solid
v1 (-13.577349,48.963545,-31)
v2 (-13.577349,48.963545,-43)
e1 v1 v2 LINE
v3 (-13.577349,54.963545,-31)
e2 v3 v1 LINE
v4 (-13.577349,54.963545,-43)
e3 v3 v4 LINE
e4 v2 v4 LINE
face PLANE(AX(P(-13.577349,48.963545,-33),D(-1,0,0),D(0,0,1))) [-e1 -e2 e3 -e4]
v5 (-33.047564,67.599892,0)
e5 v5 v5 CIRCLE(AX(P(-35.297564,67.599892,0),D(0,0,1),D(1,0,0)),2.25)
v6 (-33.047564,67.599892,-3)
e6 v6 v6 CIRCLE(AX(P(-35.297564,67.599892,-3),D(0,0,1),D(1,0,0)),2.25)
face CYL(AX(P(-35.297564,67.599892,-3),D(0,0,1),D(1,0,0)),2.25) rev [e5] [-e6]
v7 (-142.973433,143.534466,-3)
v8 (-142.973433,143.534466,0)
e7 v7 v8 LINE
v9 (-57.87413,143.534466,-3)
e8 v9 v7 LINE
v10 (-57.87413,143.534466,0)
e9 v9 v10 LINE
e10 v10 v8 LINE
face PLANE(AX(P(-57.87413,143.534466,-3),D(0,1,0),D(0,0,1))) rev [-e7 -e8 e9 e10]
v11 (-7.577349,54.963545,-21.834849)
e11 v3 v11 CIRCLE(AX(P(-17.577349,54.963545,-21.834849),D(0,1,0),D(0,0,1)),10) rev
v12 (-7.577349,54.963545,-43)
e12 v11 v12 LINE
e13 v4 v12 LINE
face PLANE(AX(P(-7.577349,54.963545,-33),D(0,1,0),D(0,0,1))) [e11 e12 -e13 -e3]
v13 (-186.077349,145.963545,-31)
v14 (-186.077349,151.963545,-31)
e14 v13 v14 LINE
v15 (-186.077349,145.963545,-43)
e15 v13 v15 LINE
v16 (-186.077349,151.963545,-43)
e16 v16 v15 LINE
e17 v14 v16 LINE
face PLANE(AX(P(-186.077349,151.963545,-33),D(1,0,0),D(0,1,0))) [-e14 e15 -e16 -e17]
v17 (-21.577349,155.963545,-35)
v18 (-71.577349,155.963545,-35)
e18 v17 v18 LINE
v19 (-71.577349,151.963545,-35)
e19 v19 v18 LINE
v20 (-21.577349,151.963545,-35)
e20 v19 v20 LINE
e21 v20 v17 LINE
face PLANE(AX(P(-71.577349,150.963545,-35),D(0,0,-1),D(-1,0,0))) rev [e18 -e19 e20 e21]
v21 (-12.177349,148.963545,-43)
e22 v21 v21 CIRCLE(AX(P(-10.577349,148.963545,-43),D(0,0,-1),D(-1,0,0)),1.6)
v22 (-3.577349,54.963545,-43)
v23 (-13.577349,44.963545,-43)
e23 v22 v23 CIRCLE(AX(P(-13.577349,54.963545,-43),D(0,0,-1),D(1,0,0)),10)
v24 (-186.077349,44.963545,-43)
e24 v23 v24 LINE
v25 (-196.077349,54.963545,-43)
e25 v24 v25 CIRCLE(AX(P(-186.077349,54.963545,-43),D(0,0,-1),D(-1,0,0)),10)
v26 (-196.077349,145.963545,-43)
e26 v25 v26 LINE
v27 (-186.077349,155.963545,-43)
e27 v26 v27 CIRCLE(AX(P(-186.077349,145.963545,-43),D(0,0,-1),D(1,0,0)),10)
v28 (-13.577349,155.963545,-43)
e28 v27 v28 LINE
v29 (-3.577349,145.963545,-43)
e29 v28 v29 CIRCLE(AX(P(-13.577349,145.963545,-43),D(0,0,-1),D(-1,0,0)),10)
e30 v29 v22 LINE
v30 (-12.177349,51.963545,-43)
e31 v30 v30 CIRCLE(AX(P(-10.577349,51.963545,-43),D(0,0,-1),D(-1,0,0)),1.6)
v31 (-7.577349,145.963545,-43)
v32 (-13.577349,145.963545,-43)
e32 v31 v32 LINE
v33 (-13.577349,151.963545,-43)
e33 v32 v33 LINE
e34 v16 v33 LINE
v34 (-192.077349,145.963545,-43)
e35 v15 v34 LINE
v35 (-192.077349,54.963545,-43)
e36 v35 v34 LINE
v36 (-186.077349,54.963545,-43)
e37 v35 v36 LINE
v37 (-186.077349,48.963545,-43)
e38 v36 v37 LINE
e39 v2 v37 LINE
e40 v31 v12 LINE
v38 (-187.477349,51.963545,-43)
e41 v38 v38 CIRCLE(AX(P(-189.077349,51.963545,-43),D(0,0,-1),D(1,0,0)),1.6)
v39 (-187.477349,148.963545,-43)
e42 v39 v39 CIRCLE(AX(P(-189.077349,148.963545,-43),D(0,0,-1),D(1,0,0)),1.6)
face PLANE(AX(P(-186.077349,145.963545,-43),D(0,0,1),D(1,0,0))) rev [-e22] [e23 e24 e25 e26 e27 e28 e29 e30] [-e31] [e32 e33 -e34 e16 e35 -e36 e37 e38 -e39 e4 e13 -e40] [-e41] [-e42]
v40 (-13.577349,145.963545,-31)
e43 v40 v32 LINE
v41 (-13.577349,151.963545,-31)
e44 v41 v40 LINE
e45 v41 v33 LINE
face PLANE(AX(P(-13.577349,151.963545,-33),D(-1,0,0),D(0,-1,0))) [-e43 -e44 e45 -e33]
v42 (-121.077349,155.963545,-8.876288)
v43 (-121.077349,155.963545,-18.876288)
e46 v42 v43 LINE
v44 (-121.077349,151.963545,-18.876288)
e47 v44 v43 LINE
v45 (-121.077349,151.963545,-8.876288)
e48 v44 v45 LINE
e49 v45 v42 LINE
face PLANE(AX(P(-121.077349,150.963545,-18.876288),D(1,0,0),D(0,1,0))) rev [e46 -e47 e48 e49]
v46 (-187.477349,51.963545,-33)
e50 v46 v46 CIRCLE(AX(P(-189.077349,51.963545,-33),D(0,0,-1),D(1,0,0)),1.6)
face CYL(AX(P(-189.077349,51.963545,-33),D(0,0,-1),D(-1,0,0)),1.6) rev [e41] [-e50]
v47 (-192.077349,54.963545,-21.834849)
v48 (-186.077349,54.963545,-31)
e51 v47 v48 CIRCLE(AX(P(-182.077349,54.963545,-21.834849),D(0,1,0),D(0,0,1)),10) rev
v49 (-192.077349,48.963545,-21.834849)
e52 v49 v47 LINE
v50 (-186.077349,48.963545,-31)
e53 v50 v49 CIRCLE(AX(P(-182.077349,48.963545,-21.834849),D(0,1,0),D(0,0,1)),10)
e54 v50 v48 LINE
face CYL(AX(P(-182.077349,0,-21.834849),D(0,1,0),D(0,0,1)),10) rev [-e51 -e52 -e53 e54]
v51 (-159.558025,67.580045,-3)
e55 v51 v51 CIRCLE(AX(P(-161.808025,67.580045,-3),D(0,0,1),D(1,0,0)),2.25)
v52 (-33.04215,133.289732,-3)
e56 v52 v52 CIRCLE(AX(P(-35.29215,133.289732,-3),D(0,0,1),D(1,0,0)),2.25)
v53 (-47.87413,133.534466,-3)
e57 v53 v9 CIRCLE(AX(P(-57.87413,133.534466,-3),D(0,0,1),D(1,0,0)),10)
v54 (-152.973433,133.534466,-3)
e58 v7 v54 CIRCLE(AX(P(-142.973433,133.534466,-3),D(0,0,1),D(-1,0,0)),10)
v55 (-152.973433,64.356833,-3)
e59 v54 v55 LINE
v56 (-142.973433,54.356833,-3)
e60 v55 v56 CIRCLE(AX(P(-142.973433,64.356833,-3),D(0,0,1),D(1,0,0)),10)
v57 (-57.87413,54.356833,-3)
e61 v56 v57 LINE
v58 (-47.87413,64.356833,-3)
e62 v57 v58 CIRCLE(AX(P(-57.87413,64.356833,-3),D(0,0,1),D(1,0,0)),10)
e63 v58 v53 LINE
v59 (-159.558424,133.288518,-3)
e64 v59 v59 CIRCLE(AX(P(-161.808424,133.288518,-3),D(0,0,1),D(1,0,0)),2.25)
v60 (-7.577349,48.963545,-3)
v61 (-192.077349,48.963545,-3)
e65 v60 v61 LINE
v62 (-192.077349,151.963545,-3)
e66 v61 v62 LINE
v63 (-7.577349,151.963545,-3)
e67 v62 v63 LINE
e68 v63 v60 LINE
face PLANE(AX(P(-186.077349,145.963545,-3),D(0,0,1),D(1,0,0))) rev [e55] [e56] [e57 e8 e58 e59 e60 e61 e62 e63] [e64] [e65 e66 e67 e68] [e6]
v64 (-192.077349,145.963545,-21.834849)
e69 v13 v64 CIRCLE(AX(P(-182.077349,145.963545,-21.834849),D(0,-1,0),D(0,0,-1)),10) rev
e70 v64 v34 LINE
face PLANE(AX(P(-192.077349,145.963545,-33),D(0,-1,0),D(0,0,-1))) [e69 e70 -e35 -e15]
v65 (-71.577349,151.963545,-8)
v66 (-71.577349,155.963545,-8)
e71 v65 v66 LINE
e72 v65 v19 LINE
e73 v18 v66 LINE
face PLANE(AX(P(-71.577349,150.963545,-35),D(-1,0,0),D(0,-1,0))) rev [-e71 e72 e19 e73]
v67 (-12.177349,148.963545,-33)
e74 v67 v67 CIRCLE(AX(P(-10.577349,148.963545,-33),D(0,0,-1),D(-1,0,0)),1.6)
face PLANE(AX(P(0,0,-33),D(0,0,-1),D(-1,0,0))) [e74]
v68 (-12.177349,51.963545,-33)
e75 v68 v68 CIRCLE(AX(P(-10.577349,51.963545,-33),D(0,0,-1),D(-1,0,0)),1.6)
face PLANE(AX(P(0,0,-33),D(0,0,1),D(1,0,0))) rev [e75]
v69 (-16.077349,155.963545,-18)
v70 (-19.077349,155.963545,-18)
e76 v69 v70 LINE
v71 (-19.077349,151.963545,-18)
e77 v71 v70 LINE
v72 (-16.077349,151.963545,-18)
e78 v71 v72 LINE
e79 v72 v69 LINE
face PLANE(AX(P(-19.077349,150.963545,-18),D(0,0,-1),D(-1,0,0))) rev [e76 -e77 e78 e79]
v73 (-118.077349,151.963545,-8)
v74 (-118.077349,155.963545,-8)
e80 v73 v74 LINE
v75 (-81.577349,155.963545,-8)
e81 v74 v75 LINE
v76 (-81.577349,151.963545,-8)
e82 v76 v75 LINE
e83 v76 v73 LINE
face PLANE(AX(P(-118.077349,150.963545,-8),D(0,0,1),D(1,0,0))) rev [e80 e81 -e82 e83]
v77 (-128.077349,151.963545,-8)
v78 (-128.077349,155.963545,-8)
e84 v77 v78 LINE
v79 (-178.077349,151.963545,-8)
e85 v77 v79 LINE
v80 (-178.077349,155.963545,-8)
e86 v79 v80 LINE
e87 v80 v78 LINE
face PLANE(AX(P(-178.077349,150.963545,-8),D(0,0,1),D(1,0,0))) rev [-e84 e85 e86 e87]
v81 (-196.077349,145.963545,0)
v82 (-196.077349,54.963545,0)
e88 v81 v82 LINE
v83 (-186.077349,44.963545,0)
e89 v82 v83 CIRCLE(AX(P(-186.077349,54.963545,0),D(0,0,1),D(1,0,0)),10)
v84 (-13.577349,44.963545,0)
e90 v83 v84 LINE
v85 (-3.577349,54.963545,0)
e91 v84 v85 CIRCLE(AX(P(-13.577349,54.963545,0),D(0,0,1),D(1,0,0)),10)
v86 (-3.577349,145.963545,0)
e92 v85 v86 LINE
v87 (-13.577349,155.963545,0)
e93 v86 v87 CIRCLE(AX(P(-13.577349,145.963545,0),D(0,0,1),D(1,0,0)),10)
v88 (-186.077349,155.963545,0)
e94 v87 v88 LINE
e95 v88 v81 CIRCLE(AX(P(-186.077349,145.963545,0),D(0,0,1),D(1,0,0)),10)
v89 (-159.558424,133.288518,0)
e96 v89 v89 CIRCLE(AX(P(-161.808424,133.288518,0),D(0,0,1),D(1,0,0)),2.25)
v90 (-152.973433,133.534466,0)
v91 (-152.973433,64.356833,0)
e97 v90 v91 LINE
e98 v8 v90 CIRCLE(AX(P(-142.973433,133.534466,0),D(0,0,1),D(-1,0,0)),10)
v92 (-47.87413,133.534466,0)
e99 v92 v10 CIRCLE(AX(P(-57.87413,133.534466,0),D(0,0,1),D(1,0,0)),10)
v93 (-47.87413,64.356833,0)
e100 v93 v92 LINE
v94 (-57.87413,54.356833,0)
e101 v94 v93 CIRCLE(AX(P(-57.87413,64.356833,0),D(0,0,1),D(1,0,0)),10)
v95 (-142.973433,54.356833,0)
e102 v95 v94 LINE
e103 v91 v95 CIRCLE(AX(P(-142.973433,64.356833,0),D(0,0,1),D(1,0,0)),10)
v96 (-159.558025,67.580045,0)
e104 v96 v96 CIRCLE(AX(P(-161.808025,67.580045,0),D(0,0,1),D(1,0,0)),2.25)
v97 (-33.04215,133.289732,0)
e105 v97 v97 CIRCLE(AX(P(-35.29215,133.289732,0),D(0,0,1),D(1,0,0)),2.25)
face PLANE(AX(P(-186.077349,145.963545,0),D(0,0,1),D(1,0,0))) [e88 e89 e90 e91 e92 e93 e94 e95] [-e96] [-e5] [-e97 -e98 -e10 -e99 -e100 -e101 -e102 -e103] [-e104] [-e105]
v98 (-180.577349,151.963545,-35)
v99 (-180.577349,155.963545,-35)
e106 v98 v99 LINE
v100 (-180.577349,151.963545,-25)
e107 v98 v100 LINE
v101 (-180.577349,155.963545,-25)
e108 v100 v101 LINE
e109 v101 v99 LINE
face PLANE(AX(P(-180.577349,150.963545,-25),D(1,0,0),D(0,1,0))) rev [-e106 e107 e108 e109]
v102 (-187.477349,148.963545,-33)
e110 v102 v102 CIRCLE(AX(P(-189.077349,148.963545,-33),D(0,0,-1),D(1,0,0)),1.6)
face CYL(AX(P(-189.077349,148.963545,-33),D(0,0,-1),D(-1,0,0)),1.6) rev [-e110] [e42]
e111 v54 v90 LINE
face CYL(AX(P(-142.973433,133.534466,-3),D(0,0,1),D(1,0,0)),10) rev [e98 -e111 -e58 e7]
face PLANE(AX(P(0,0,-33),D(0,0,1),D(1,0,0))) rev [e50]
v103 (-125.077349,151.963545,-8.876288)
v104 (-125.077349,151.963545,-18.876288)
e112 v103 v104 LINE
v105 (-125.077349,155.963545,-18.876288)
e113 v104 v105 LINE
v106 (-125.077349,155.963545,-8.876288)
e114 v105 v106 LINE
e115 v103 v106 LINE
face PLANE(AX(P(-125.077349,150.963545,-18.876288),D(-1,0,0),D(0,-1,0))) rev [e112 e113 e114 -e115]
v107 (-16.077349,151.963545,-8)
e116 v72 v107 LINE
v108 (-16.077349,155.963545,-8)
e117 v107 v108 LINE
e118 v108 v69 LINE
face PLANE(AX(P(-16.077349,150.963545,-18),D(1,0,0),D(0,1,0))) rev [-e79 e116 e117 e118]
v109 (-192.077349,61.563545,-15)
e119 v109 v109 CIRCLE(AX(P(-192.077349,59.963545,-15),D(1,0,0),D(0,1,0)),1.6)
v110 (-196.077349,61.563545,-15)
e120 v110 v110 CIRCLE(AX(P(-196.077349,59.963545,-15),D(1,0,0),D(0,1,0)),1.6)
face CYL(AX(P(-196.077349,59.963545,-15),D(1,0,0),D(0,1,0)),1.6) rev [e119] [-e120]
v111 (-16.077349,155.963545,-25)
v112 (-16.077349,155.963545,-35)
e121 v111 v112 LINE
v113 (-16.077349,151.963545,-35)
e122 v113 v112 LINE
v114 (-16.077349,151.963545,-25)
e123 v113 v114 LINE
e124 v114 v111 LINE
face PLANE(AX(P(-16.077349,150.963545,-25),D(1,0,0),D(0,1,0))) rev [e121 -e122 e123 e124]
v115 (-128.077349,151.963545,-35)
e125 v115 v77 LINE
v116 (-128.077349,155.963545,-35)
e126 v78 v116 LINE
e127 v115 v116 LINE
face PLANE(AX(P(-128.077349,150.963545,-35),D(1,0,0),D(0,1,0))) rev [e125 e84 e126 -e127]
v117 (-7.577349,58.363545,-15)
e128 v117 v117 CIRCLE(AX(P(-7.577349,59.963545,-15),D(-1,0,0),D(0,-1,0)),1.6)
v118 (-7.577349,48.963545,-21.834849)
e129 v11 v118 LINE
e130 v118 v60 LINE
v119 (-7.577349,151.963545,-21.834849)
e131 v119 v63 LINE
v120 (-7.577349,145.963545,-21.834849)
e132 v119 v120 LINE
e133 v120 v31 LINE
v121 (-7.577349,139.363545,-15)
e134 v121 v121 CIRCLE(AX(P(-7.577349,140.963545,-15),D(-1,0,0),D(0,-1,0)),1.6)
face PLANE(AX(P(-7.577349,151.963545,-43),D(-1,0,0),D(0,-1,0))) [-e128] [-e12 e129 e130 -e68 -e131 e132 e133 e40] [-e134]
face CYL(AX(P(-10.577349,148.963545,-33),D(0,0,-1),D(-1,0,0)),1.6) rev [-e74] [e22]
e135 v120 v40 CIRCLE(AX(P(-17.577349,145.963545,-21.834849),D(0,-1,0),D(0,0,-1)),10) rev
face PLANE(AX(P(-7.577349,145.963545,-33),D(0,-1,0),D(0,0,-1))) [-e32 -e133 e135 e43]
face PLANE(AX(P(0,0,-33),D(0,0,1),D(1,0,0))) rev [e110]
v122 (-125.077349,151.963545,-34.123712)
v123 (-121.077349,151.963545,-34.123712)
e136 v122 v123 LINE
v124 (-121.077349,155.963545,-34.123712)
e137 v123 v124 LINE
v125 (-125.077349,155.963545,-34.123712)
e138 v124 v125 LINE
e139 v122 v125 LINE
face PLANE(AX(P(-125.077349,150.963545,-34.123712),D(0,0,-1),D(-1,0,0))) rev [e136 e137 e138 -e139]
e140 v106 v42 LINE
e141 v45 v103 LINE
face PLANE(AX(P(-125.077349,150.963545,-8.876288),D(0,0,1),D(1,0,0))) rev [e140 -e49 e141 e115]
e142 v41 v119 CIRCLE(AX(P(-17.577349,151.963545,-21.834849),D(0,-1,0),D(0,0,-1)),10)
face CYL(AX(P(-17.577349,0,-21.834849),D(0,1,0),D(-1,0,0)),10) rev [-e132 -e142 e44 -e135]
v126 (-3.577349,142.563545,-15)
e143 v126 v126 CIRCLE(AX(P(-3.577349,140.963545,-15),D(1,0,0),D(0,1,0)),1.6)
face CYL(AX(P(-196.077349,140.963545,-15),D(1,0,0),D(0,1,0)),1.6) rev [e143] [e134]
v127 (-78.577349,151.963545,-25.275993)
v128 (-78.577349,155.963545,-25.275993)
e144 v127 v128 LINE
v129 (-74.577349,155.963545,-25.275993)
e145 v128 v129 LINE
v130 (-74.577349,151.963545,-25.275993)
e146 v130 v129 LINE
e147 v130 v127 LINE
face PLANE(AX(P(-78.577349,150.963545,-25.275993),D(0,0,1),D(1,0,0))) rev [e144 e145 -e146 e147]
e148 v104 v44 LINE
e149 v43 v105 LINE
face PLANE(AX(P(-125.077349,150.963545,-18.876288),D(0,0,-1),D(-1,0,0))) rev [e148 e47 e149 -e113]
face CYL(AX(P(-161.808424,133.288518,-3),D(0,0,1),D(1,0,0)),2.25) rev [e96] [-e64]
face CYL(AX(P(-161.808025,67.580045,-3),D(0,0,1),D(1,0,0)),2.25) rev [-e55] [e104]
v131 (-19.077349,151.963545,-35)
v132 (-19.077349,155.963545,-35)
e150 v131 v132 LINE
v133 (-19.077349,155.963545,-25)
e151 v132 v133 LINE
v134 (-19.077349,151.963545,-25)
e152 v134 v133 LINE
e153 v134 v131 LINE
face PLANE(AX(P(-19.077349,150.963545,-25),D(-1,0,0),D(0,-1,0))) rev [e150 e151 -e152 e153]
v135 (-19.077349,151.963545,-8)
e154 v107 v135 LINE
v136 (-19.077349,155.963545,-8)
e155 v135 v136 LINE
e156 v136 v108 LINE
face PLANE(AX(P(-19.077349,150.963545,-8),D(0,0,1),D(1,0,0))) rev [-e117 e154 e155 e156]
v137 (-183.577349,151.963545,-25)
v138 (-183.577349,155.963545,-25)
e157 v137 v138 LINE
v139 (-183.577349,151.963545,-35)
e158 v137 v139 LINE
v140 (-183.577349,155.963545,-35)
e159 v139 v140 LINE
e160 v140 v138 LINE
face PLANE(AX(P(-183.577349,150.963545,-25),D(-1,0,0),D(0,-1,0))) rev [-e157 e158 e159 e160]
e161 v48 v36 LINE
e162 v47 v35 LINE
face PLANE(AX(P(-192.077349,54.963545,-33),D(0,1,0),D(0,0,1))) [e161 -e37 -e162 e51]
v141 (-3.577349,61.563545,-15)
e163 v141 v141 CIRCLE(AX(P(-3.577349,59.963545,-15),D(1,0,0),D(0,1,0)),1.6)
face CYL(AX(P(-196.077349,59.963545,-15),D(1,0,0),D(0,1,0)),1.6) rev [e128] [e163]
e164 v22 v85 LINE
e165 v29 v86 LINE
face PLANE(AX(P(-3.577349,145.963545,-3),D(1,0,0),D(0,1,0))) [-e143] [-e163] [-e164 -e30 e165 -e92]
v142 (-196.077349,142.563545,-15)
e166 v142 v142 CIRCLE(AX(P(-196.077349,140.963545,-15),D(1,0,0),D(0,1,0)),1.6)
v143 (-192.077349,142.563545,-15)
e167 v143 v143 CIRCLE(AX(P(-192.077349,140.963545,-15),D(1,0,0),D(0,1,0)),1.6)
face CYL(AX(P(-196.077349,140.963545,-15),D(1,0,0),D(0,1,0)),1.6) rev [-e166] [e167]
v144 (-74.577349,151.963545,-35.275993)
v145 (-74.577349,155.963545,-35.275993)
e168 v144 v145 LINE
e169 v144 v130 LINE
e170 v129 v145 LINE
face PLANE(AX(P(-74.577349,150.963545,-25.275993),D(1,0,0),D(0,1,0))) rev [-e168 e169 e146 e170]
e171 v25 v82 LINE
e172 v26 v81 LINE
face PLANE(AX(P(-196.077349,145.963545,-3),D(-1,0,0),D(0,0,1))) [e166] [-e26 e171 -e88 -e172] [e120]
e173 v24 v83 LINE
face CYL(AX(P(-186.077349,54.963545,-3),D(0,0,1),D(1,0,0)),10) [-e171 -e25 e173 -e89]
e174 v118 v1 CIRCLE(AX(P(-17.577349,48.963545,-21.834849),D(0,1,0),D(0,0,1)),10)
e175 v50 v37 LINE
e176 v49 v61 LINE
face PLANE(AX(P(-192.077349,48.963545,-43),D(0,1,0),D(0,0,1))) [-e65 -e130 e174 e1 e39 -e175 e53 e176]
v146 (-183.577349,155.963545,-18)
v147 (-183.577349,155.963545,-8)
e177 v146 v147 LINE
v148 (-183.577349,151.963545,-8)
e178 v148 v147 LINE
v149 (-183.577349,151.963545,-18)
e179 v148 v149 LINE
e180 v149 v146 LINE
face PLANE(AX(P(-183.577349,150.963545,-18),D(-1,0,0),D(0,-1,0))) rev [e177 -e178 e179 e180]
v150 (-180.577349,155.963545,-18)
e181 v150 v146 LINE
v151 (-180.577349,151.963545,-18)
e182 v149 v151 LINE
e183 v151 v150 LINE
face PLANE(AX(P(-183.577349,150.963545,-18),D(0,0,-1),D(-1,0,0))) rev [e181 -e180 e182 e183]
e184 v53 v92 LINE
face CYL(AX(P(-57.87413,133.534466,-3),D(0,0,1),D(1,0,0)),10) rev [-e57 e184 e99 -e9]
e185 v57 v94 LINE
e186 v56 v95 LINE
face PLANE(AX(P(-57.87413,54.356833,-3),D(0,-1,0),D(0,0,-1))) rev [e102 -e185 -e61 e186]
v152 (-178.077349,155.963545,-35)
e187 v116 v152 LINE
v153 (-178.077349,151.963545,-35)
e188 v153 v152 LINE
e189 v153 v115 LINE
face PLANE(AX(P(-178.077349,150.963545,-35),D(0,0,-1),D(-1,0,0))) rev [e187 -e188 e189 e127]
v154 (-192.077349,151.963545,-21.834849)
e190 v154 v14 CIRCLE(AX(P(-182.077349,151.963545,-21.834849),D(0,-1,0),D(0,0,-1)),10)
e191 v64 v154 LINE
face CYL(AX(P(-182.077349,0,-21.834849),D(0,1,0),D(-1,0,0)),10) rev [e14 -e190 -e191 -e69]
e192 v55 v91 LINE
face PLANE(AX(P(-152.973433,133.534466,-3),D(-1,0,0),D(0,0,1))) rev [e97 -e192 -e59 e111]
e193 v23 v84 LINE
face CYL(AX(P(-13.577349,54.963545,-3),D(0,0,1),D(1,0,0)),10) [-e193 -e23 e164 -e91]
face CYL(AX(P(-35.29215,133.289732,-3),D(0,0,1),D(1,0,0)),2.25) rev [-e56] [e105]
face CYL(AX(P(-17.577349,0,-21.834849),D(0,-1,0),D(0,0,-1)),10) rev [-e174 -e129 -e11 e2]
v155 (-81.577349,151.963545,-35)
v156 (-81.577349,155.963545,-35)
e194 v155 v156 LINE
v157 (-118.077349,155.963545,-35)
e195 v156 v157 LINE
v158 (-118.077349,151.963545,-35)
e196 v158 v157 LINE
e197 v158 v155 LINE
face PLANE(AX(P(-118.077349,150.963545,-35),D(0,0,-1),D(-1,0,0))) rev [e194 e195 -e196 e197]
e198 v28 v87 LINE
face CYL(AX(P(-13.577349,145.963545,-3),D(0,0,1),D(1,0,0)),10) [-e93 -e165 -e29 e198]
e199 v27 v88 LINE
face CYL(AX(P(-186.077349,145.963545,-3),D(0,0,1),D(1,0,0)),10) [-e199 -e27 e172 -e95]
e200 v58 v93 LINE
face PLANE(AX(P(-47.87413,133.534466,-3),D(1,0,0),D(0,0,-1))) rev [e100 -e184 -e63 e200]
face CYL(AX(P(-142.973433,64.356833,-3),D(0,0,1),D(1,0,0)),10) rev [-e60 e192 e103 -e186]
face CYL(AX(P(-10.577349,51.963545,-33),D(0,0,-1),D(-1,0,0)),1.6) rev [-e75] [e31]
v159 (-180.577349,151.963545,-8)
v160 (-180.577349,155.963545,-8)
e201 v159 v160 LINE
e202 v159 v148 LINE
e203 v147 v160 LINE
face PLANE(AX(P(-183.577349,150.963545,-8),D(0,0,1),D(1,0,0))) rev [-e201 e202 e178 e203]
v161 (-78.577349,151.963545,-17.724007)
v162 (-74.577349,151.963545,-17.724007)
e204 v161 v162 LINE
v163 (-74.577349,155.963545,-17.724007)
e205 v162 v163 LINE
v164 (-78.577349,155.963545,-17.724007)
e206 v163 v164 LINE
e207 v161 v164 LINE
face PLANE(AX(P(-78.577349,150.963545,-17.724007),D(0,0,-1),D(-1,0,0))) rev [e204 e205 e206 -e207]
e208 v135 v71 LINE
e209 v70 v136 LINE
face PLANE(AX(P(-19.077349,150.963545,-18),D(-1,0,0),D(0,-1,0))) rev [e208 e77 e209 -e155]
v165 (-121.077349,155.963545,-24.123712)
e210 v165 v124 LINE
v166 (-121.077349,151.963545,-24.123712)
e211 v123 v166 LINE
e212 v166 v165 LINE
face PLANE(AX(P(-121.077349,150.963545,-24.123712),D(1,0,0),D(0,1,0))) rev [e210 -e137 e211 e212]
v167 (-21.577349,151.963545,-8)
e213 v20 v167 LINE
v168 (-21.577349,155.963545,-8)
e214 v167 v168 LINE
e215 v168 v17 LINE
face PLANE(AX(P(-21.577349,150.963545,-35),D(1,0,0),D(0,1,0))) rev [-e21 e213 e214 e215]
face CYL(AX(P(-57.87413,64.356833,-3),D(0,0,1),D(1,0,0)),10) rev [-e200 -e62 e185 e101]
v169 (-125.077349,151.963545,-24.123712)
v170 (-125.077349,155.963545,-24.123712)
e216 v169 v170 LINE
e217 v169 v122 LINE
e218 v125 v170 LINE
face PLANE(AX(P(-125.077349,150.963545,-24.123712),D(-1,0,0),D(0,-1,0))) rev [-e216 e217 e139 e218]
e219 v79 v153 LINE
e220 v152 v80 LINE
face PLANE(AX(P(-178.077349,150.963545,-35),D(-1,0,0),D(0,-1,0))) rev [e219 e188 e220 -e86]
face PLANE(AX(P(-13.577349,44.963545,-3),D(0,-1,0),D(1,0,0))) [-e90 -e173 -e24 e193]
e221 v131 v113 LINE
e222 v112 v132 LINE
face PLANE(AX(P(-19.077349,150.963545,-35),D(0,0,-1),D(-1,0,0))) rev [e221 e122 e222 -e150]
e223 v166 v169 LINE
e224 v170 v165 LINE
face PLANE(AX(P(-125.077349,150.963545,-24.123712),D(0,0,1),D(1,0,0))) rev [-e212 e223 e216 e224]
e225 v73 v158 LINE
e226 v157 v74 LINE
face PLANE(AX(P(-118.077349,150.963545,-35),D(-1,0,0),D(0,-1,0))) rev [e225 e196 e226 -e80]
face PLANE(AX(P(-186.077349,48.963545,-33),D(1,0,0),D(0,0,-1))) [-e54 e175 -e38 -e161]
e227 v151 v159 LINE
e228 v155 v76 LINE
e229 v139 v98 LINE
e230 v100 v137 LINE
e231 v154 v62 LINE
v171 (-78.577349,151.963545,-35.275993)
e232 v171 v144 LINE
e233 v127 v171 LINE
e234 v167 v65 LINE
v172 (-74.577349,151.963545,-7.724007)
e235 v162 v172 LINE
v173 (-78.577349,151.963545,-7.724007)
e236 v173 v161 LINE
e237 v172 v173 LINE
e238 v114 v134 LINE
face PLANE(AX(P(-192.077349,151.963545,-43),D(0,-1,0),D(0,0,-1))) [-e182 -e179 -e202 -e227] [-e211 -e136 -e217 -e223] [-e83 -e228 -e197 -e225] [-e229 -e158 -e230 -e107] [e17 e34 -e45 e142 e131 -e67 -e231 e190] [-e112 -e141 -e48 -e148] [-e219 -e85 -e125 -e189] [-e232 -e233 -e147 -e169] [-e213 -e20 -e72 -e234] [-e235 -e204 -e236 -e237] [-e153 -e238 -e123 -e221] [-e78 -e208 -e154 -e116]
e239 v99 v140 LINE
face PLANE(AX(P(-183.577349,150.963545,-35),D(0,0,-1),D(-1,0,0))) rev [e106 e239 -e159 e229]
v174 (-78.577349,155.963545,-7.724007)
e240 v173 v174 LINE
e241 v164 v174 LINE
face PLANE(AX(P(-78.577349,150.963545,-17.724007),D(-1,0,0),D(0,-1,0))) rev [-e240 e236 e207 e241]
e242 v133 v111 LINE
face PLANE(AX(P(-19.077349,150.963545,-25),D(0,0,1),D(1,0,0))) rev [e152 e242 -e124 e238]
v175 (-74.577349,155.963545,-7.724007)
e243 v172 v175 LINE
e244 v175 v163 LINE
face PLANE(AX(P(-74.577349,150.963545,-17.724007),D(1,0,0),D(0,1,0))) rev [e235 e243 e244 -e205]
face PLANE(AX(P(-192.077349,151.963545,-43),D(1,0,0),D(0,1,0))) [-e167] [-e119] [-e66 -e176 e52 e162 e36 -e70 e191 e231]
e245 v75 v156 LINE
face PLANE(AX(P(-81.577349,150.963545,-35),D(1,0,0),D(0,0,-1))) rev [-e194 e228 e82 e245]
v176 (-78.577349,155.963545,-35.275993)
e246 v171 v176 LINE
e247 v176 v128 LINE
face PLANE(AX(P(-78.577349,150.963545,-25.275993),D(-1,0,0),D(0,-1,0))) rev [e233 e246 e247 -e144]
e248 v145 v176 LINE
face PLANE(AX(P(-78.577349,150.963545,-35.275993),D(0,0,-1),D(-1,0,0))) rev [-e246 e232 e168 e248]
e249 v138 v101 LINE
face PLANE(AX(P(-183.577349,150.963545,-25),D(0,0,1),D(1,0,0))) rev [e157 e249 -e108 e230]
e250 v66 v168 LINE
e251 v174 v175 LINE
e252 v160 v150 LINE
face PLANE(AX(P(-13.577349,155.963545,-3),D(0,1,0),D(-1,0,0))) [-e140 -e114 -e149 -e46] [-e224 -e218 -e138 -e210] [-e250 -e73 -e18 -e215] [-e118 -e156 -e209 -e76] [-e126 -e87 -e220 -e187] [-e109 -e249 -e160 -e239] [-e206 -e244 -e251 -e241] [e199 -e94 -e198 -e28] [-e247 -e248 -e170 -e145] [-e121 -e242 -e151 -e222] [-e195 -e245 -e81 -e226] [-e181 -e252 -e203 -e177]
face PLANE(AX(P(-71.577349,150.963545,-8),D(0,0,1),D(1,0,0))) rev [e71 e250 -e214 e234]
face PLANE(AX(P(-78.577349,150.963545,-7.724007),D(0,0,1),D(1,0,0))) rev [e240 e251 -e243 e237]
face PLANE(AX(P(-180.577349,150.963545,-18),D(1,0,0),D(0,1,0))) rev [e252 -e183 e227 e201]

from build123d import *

# Parameters (mm, degrees)
SKETCH1_R           = 2.25
BOSS_EXTRUDE1_DEPTH = 3
BOSS_EXTRUDE3_DEPTH = 40
SKETCH4_W           = 6
SKETCH4_H           = 6
SKETCH4_R           = 1.6
BOSS_EXTRUDE4_DEPTH = 10
SKETCH5_W           = 6
SKETCH5_H           = 6
BOSS_EXTRUDE5_DEPTH = 2
FILLET3_R           = 10
SKETCH6_W           = 50
SKETCH6_H           = 27
SKETCH6_W_2         = 36.5
CUT_EXTRUDE1_DEPTH  = 5
SKETCH8_W           = 4
SKETCH8_H           = 10
SKETCH8_W_2         = 3
CUT_EXTRUDE2_DEPTH  = 5
SKETCH9_R           = 1.6
CUT_EXTRUDE3_DEPTH  = 252.455517463


with BuildPart() as part:
    # Sketch1 → Boss-Extrude1 (new body)
    with BuildSketch(Plane.XY):
        with BuildLine():
            Line((-13.577349449, 155.963544659), (-186.077349449, 155.963544659))
            ThreePointArc((-186.077349449, 155.963544659), (-193.148417261, 153.034612471), (-196.077349449, 145.963544659))
            Line((-196.077349449, 145.963544659), (-196.077349449, 54.963544659))
            ThreePointArc((-196.077349449, 54.963544659), (-193.148417261, 47.892476847), (-186.077349449, 44.963544659))
            Line((-186.077349449, 44.963544659), (-13.577349449, 44.963544659))
            ThreePointArc((-13.577349449, 44.963544659), (-6.506281637, 47.892476847), (-3.577349449, 54.963544659))
            Line((-3.577349449, 54.963544659), (-3.577349449, 145.963544659))
            ThreePointArc((-3.577349449, 145.963544659), (-6.506281637, 153.034612471), (-13.577349449, 155.963544659))
        make_face()
        with Locations((-35.292149682, 133.289732278)):
            Circle(SKETCH1_R, mode=Mode.SUBTRACT)
        with Locations((-35.297563809, 67.599891559)):
            Circle(SKETCH1_R, mode=Mode.SUBTRACT)
        with Locations((-161.808024727, 67.580045294)):
            Circle(SKETCH1_R, mode=Mode.SUBTRACT)
        with Locations((-161.808423577, 133.28851775)):
            Circle(SKETCH1_R, mode=Mode.SUBTRACT)
        with BuildLine():
            Line((-57.8741303, 143.534465984), (-142.973432949, 143.534465984))
            ThreePointArc((-142.973432949, 143.534465984), (-150.044500761, 140.605533796), (-152.973432949, 133.534465984))
            Line((-152.973432949, 133.534465984), (-152.973432949, 64.356832554))
            ThreePointArc((-152.973432949, 64.356832554), (-150.044500761, 57.285764742), (-142.973432949, 54.356832554))
            Line((-142.973432949, 54.356832554), (-57.8741303, 54.356832554))
            ThreePointArc((-57.8741303, 54.356832554), (-50.803062488, 57.285764742), (-47.8741303, 64.356832554))
            Line((-47.8741303, 64.356832554), (-47.8741303, 133.534465984))
            ThreePointArc((-47.8741303, 133.534465984), (-50.803062488, 140.605533796), (-57.8741303, 143.534465984))
        make_face(mode=Mode.SUBTRACT)
    extrude(amount=-BOSS_EXTRUDE1_DEPTH)

    # Sketch3 → Boss-Extrude3 (add)
    with BuildSketch(Plane(origin=(0, 0, -3), x_dir=(-1, 0, 0), z_dir=(0, 0, -1))):
        with BuildLine():
            Line((3.577349449, 145.963544659), (3.577349449, 54.963544659))
            ThreePointArc((3.577349449, 54.963544659), (6.506281637, 47.892476847), (13.577349449, 44.963544659))
            Line((13.577349449, 44.963544659), (99.827349449, 44.963544659))
            Line((99.827349449, 44.963544659), (186.077349449, 44.963544659))
            ThreePointArc((186.077349449, 44.963544659), (193.148417261, 47.892476847), (196.077349449, 54.963544659))
            Line((196.077349449, 54.963544659), (196.077349449, 145.963544659))
            ThreePointArc((196.077349449, 145.963544659), (193.148417261, 153.034612471), (186.077349449, 155.963544659))
            Line((186.077349449, 155.963544659), (99.827349449, 155.963544659))
            Line((99.827349449, 155.963544659), (13.577349449, 155.963544659))
            ThreePointArc((13.577349449, 155.963544659), (6.506281637, 153.034612471), (3.577349449, 145.963544659))
        make_face()
        Polygon((7.577349449, 151.963544659), (7.577349449, 48.963544659), (99.827349449, 48.963544659), (192.077349449, 48.963544659), (192.077349449, 151.963544659), (99.827349449, 151.963544659), align=None, mode=Mode.SUBTRACT)
    extrude(amount=BOSS_EXTRUDE3_DEPTH)

    # Sketch4 → Boss-Extrude4 (add)
    # profile 1 of 4: a face of its own
    with BuildSketch(Plane(origin=(0, 0, -43), x_dir=(-1, 0, 0), z_dir=(0, 0, -1))):
        with Locations((10.577349449, 148.963544659)):
            Rectangle(SKETCH4_W, SKETCH4_H)
        with Locations((10.577349449, 148.963544659)):
            Circle(SKETCH4_R, mode=Mode.SUBTRACT)
    # profile 2 of 4: a face of its own
    with BuildSketch(Plane(origin=(0, 0, -43), x_dir=(-1, 0, 0), z_dir=(0, 0, -1))):
        with Locations((189.077349449, 148.963544659)):
            Rectangle(SKETCH4_W, SKETCH4_H)
        with Locations(Location((189.077349449, 148.963544659, 0), (0, 0, 180))):
            Circle(SKETCH4_R, mode=Mode.SUBTRACT)
    # profile 3 of 4: a face of its own
    with BuildSketch(Plane(origin=(0, 0, -43), x_dir=(-1, 0, 0), z_dir=(0, 0, -1))):
        with Locations((189.077349449, 51.963544659)):
            Rectangle(SKETCH4_W, SKETCH4_H)
        with Locations(Location((189.077349449, 51.963544659, 0), (0, 0, 180))):
            Circle(SKETCH4_R, mode=Mode.SUBTRACT)
    # profile 4 of 4: a face of its own
    with BuildSketch(Plane(origin=(0, 0, -43), x_dir=(-1, 0, 0), z_dir=(0, 0, -1))):
        with Locations((10.577349449, 51.963544659)):
            Rectangle(SKETCH4_W, SKETCH4_H)
        with Locations((10.577349449, 51.963544659)):
            Circle(SKETCH4_R, mode=Mode.SUBTRACT)
    extrude(amount=-BOSS_EXTRUDE4_DEPTH)

    # Sketch5 → Boss-Extrude5 (add)
    with BuildSketch(Plane.XY.offset(-33)):
        with Locations((-189.077349449, 148.963544659)):
            Rectangle(SKETCH5_W, SKETCH5_H)
        with Locations((-189.077349449, 51.963544659)):
            Rectangle(SKETCH5_W, SKETCH5_H)
        with Locations((-10.577349449, 51.963544659)):
            Rectangle(SKETCH5_W, SKETCH5_H)
        with Locations((-10.577349449, 148.963544659)):
            Rectangle(SKETCH5_W, SKETCH5_H)
    extrude(amount=BOSS_EXTRUDE5_DEPTH)

    # Fillet3
    # the kernel refuses this fillet: 10 mm, written as the material it adds along each edge
    with BuildSketch(Plane(origin=(-192.077349449, 145.963544659, -31), x_dir=(1, 0, 0), z_dir=(0, 1, 0)), Plane(origin=(-7.577349449, 151.963544659, -31), x_dir=(-1, 0, 0), z_dir=(0, -1, 0))) as fillet3_piece_1:
        with BuildLine():
            CenterArc((10, -9.16515139), FILLET3_R, 113.578178478, 66.421821522)
            Line((0, -9.16515139), (-0.2, -9.16515139))
            Line((-0.2, -9.16515139), (-0.2, 0))
            Line((-0.2, 0), (0, 0.2))
            ThreePointArc((0, 0.2), (3, 0.2), (5.92, 0.183303028))
            Line((5.92, 0.183303028), (6, 0))
        make_face()
    extrude(amount=6)
    with BuildSketch(Plane(origin=(-192.077349449, 48.963544659, -31), x_dir=(0, 0, 1), z_dir=(0, 1, 0))) as fillet3_piece_2:
        with BuildLine():
            CenterArc((9.16515139, 10), FILLET3_R, 203.578178478, 66.421821522)
            Line((0, 6), (-0.183303028, 5.92))
            ThreePointArc((-0.183303028, 5.92), (-0.2, 3), (-0.2, 0))
            Line((-0.2, 0), (0, -0.2))
            Line((0, -0.2), (9.16515139, -0.2))
            Line((9.16515139, -0.2), (9.16515139, 0))
        make_face()
    extrude(amount=6)
    with BuildSketch(Plane(origin=(-7.577349449, 48.963544659, -31), x_dir=(-1, 0, 0), z_dir=(0, 1, 0))) as fillet3_piece_3:
        with BuildLine():
            CenterArc((10, 9.16515139), FILLET3_R, 180, 66.421821522)
            Line((0, 9.16515139), (-0.2, 9.16515139))
            Line((-0.2, 9.16515139), (-0.2, 0))
            Line((-0.2, 0), (0, -0.2))
            ThreePointArc((0, -0.2), (3, -0.2), (5.92, -0.183303028))
            Line((5.92, -0.183303028), (6, 0))
        make_face()
    extrude(amount=6)

    # Sketch6 → Cut-Extrude1 (cut)
    with BuildSketch(Plane(origin=(0, 155.963544659, 0), x_dir=(1, 0, 0), z_dir=(0, 1, 0))):
        with Locations((-153.077349449, 21.5)):
            Rectangle(SKETCH6_W, SKETCH6_H)
        with Locations((-99.827349449, 21.5)):
            Rectangle(SKETCH6_W_2, SKETCH6_H)
        with Locations((-46.577349449, 21.5)):
            Rectangle(SKETCH6_W, SKETCH6_H)
    extrude(amount=-CUT_EXTRUDE1_DEPTH, mode=Mode.SUBTRACT)

    # Sketch8 → Cut-Extrude2 (cut)
    with BuildSketch(Plane(origin=(0, 155.963544659, 0), x_dir=(1, 0, 0), z_dir=(0, 1, 0))):
        with Locations((-123.077349449, 13.876287988)):
            Rectangle(SKETCH8_W, SKETCH8_H)
        with Locations((-76.577349449, 12.724006881)):
            Rectangle(SKETCH8_W, SKETCH8_H)
        with Locations((-76.577349449, 30.275993119)):
            Rectangle(SKETCH8_W, SKETCH8_H)
        with Locations((-123.077349449, 29.123712012)):
            Rectangle(SKETCH8_W, SKETCH8_H)
        with Locations((-17.577349449, 13)):
            Rectangle(SKETCH8_W_2, SKETCH8_H)
        with Locations((-182.077349449, 13)):
            Rectangle(SKETCH8_W_2, SKETCH8_H)
        with Locations((-17.577349449, 30)):
            Rectangle(SKETCH8_W_2, SKETCH8_H)
        with Locations((-182.077349449, 30)):
            Rectangle(SKETCH8_W_2, SKETCH8_H)
    extrude(amount=-CUT_EXTRUDE2_DEPTH, mode=Mode.SUBTRACT)

    # Sketch9 → Cut-Extrude3 (cut, through all)
    with BuildSketch(Plane(origin=(-3.577349449, 0, 0), x_dir=(0, 0, -1), z_dir=(1, 0, 0))):
        with Locations(Location((15, 140.963544659, 0), (0, 0, 90))):
            Circle(SKETCH9_R)
        with Locations(Location((15, 59.963544659, 0), (0, 0, 90))):
            Circle(SKETCH9_R)
    extrude(amount=-CUT_EXTRUDE3_DEPTH, mode=Mode.SUBTRACT)


solid = part.part
